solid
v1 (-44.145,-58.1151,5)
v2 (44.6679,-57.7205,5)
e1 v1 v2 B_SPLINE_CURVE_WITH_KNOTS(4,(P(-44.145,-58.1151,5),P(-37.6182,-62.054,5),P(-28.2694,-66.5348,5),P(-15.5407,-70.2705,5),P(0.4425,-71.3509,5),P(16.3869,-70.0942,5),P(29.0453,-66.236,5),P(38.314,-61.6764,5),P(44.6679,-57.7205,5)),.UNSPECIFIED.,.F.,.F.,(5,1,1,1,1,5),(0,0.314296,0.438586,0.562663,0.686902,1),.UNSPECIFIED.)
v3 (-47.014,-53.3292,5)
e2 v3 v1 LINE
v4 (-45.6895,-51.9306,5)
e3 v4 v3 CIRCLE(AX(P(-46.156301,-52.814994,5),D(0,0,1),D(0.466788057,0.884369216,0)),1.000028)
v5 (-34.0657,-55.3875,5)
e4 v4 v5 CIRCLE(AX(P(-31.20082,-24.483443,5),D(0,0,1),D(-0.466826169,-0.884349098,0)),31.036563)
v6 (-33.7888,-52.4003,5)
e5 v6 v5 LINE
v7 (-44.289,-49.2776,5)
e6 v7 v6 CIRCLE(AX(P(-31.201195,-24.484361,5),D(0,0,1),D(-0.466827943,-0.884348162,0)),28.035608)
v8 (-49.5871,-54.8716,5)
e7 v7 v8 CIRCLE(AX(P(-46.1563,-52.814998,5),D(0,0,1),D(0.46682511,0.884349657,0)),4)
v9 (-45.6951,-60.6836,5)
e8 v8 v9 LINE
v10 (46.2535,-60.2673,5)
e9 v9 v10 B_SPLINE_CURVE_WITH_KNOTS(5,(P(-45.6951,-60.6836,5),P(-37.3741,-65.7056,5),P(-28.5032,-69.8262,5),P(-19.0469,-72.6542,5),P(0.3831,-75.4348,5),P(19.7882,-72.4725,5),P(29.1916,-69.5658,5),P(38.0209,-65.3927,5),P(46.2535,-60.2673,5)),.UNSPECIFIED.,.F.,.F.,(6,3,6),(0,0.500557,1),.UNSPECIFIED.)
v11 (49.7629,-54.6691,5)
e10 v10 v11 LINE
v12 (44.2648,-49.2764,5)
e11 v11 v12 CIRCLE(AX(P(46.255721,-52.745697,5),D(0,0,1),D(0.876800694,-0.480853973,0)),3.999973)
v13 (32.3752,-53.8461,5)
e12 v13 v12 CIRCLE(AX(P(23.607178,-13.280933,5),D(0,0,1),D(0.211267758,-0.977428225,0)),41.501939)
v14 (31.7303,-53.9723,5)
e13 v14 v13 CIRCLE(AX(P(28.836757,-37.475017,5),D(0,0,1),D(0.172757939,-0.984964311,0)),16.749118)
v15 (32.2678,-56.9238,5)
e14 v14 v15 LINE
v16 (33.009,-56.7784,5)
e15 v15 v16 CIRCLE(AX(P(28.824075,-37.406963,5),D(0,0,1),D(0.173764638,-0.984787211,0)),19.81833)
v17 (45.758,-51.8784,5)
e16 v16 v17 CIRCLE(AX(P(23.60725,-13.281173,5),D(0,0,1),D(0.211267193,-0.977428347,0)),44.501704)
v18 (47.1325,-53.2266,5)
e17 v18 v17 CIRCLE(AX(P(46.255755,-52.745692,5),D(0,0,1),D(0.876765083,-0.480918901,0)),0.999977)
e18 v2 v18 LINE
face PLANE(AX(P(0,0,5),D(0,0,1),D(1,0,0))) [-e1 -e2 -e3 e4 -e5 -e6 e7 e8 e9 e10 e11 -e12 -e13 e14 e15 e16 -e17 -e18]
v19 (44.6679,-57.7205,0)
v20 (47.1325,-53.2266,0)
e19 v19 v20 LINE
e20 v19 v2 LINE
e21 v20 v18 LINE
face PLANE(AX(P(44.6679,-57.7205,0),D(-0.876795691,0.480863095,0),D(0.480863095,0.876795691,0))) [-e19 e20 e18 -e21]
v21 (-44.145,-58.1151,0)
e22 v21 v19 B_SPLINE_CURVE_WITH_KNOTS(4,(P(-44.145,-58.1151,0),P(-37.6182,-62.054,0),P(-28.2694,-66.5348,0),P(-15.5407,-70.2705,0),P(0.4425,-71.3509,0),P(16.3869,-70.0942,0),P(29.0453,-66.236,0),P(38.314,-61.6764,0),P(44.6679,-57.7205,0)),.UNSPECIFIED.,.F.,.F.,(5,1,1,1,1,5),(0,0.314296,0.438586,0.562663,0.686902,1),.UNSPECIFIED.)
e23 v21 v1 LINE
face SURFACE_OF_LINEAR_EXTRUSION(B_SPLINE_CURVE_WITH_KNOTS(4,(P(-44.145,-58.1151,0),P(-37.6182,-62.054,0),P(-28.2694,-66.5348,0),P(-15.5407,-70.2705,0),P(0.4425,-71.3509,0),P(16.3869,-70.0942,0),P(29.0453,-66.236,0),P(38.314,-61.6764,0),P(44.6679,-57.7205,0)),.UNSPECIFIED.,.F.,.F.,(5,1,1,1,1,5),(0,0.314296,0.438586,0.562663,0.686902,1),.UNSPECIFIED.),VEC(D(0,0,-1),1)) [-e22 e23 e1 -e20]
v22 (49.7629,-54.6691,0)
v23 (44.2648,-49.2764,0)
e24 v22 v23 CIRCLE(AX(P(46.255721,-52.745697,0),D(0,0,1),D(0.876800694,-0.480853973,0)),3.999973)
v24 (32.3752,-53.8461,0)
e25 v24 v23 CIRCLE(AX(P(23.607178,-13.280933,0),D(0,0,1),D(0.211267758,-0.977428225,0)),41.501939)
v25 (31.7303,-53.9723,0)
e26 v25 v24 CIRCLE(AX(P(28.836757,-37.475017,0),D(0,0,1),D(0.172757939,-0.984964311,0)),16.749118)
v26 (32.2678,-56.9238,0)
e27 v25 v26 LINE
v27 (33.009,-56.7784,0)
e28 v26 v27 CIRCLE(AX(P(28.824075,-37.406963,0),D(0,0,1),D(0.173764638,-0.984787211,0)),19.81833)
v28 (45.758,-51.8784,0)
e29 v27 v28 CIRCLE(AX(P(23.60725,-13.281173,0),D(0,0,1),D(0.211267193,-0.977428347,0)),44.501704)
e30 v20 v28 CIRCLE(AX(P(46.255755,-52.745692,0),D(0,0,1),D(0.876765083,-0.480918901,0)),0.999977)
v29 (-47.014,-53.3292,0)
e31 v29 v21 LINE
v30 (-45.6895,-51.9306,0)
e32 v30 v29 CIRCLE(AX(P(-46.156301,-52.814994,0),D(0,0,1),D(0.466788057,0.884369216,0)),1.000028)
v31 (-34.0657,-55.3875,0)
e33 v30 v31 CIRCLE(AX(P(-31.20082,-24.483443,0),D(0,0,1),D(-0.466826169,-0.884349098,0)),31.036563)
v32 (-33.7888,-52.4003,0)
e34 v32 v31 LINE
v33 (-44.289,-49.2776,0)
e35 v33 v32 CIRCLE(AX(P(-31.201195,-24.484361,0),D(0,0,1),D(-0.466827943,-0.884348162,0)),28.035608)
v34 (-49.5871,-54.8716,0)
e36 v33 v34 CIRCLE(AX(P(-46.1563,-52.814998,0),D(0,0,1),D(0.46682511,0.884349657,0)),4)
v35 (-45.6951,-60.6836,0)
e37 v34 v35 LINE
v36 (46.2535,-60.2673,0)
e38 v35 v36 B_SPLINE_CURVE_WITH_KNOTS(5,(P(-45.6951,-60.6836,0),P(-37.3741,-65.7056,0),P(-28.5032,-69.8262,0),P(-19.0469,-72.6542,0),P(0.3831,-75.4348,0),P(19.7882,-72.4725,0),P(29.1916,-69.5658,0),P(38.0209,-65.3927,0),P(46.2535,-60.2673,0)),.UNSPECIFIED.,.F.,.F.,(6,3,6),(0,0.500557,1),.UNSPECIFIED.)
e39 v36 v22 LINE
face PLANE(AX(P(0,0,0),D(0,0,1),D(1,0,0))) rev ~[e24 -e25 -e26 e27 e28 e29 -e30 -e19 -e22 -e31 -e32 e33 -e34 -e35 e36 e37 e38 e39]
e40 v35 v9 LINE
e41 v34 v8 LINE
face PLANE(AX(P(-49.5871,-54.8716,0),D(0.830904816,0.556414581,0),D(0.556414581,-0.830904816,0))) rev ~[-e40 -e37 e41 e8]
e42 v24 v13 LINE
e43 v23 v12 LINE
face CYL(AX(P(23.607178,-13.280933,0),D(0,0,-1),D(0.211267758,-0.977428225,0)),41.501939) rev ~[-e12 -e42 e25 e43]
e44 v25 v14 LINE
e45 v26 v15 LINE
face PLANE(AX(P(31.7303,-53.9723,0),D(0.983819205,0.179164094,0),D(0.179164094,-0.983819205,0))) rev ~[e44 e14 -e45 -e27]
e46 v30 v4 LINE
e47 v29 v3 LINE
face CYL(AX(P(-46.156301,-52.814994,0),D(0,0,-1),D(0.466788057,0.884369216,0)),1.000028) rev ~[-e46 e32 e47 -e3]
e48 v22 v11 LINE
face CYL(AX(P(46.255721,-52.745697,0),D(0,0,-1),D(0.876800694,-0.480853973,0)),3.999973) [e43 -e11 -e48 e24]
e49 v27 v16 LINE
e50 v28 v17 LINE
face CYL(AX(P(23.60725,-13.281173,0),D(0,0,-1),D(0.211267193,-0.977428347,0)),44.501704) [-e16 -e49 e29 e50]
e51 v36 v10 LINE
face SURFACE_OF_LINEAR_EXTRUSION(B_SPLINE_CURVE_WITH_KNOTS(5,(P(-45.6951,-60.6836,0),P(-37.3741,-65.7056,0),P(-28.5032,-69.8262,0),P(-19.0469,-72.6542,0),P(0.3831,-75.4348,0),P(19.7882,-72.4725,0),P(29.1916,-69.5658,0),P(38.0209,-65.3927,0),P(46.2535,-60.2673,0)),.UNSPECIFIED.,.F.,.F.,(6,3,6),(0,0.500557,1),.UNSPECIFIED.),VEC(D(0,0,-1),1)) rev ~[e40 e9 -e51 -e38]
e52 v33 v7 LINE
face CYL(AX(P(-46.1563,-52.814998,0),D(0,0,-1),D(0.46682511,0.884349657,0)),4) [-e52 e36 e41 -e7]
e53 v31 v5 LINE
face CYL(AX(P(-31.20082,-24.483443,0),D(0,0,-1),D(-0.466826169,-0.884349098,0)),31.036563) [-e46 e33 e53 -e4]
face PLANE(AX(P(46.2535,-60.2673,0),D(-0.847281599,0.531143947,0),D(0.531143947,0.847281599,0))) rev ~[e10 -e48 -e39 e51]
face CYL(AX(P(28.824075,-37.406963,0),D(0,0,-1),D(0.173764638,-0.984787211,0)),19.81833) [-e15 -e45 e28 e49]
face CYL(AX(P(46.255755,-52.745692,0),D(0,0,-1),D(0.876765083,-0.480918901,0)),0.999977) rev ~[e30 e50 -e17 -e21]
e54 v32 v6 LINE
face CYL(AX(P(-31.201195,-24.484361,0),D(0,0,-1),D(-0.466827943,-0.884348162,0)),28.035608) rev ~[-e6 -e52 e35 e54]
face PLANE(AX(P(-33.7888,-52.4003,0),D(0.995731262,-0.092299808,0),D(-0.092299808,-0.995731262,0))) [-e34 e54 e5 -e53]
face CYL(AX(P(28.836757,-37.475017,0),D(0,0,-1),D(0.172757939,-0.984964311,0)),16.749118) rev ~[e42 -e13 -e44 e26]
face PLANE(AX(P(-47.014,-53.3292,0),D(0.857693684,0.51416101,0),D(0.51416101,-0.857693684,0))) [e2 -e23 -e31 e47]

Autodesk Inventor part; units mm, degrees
ref_plane "YZ Plane" through (0, 0, 0) normal (1, 0, 0) x (0, 1, 0)
ref_plane "XZ Plane" through (0, 0, 0) normal (0, 1, 0) x (-1, 0, 0)
ref_plane "XY Plane" through (0, 0, 0) normal (0, 0, 1) x (1, 0, 0)
sketch "スケッチ1" plane through (0, 0, 0) normal (0, 0, 1) x (1, 0, 0)
  arc A0 (47.1325, -53.2266) -> (45.758, -51.8784) centre (46.2557, -52.7457) ccw
  arc A1 (33.009, -56.7784) -> (45.758, -51.8784) centre (23.6069, -13.28) ccw
  arc A2 (11.1932, -28.6204) -> (33.009, -56.7784) centre (28.8377, -37.4801) ccw
  arc A3 (11.1932, -28.6204) -> (-11.1841, -28.6384) centre (0, -23) ccw
  arc A4 (-22.0046, -54.1258) -> (-11.1841, -28.6384) centre (-27.3796, -36.8033) ccw
  arc A5 (-45.6895, -51.9306) -> (-22.0046, -54.1258) centre (-31.2017, -24.4856) ccw
  arc A6 (-45.6895, -51.9306) -> (-47.014, -53.3291) centre (-46.1563, -52.815) ccw
  line L0 (-47.014, -53.3291) -> (-44.145, -58.1151)
  spline S0 degree 4 poles (-44.145, -58.1151) (-43.8381, -58.3003) (-43.4088, -58.5568) (-42.8575, -58.8816) (-42.1841, -59.2711) (-41.6963, -59.5497) (-41.2094, -59.8243) (-40.7232, -60.0949) (-40.2377, -60.3617) (-39.7528, -60.6247) (-39.2684, -60.8839) (-38.7844, -61.1395) (-38.3007, -61.3914) (-37.8172, -61.6398) (-37.334, -61.8846) (-36.8508, -62.1259) (-36.3678, -62.3637) (-35.8847, -62.5981) (-35.4015, -62.8291) (-34.9183, -63.0567) (-34.4349, -63.281) (-33.9513, -63.502) (-33.4675, -63.7196) (-32.9834, -63.934) (-32.499, -64.1451) (-32.0143, -64.3529) (-31.5292, -64.5576) (-31.0437, -64.7589) (-30.5578, -64.9571) (-30.0715, -65.1521) (-29.5847, -65.3439) (-29.0974, -65.5325) (-28.6097, -65.7179) (-28.1214, -65.9001) (-27.6326, -66.0792) (-27.1433, -66.2551) (-26.6534, -66.4278) (-26.163, -66.5974) (-25.6721, -66.7638) (-25.1806, -66.927) (-24.6885, -67.0871) (-24.1958, -67.244) (-23.7026, -67.3978) (-23.2087, -67.5484) (-22.7144, -67.6958) (-22.2194, -67.8401) (-21.7238, -67.9811) (-21.2277, -68.1191) (-20.7311, -68.2538) (-20.2338, -68.3854) (-19.736, -68.5137) (-19.2377, -68.6389) (-18.7388, -68.7609) (-18.2393, -68.8798) (-17.7394, -68.9954) (-17.2389, -69.1078) (-16.7379, -69.217) (-16.2363, -69.323) (-15.7343, -69.4258) (-15.2318, -69.5254) (-14.7289, -69.6218) (-14.2255, -69.7149) (-13.7216, -69.8049) (-13.2173, -69.8915) (-12.7125, -69.975) (-12.2074, -70.0552) (-11.7018, -70.1322) (-11.1959, -70.2059) (-10.6896, -70.2764) (-10.1829, -70.3436) (-9.6759, -70.4075) (-9.1686, -70.4683) (-8.661, -70.5257) (-8.1531, -70.5799) (-7.6449, -70.6308) (-7.1364, -70.6784) (-6.6277, -70.7228) (-6.1188, -70.7639) (-5.6096, -70.8017) (-5.1003, -70.8362) (-4.5907, -70.8674) (-4.0811, -70.8954) (-3.5712, -70.9201) (-3.0613, -70.9415) (-2.5513, -70.9596) (-2.0411, -70.9744) (-1.5309, -70.9859) (-1.0206, -70.9941) (-0.5103, -70.9991) (0, -71.0007) (0.5103, -70.9991) (1.0206, -70.9941) (1.5309, -70.9859) (2.0411, -70.9744) (2.5512, -70.9596) (3.0613, -70.9415) (3.5712, -70.9201) (4.0811, -70.8954) (4.5907, -70.8674) (5.1002, -70.8362) (5.6096, -70.8017) (6.1187, -70.7639) (6.6276, -70.7228) (7.1363, -70.6784) (7.6447, -70.6308) (8.1529, -70.5799) (8.6608, -70.5257) (9.1683, -70.4683) (9.6756, -70.4076) (10.1825, -70.3436) (10.6891, -70.2764) (11.1953, -70.2059) (11.7011, -70.1322) (12.2065, -70.0553) (12.7115, -69.9751) (13.2161, -69.8917) (13.7202, -69.805) (14.2238, -69.7151) (14.727, -69.622) (15.2297, -69.5257) (15.7318, -69.4261) (16.2335, -69.3234) (16.7346, -69.2175) (17.2352, -69.1083) (17.7352, -68.996) (18.2346, -68.8805) (18.7335, -68.7617) (19.2317, -68.6399) (19.7293, -68.5148) (20.2264, -68.3866) (20.7227, -68.2552) (21.2185, -68.1207) (21.7136, -67.983) (22.208, -67.8421) (22.7018, -67.6981) (23.1948, -67.551) (23.6872, -67.4008) (24.1789, -67.2474) (24.6699, -67.0909) (25.1602, -66.9313) (25.6497, -66.7686) (26.1386, -66.6028) (26.6267, -66.4339) (27.1141, -66.2618) (27.6008, -66.0867) (28.0867, -65.9085) (28.5719, -65.7272) (29.0563, -65.5428) (29.54, -65.3554) (30.023, -65.1648) (30.5052, -64.9712) (30.9867, -64.7745) (31.4674, -64.5748) (31.9475, -64.3719) (32.4267, -64.166) (32.9053, -63.9571) (33.3831, -63.745) (33.8603, -63.5299) (34.3367, -63.3117) (34.8124, -63.0904) (35.2875, -62.8661) (35.7619, -62.6386) (36.2356, -62.4081) (36.7086, -62.1745) (37.181, -61.9378) (37.6528, -61.698) (38.124, -61.455) (38.5946, -61.209) (39.0646, -60.9598) (39.5341, -60.7075) (40.003, -60.452) (40.4714, -60.1934) (40.9394, -59.9316) (41.4069, -59.6666) (41.8739, -59.3984) (42.3406, -59.127) (42.8069, -58.8523) (43.4481, -58.4698) (43.9715, -58.1517) (44.3779, -57.9011) (44.6679, -57.7205) knots 0 0 0 0 0 0.014541 0.020333 0.02611 0.031872 0.03762 0.043355 0.049078 0.054789 0.060489 0.066178 0.071857 0.077527 0.083187 0.088839 0.094483 0.10012 0.105749 0.111371 0.116986 0.122595 0.128199 0.133797 0.139389 0.144976 0.150559 0.156136 0.16171 0.167279 0.172845 0.178407 0.183965 0.18952 0.195072 0.20062 0.206166 0.211709 0.21725 0.222788 0.228323 0.233857 0.239388 0.244918 0.250445 0.255971 0.261495 0.267017 0.272538 0.278057 0.283575 0.289092 0.294608 0.300122 0.305635 0.311147 0.316658 0.322169 0.327678 0.333186 0.338694 0.344201 0.349707 0.355213 0.360718 0.366222 0.371726 0.377229 0.382732 0.388235 0.393737 0.399238 0.404739 0.41024 0.415741 0.421241 0.426741 0.432241 0.43774 0.44324 0.448739 0.454238 0.459737 0.465236 0.470734 0.476233 0.481731 0.48723 0.492728 0.498227 0.503725 0.509224 0.514722 0.520221 0.525719 0.531218 0.536717 0.542216 0.547715 0.553214 0.558714 0.564214 0.569713 0.575214 0.580714 0.586215 0.591716 0.597217 0.602718 0.60822 0.613723 0.619225 0.624728 0.630232 0.635736 0.641241 0.646746 0.652251 0.657758 0.663264 0.668772 0.67428 0.679789 0.685299 0.690809 0.69632 0.701832 0.707345 0.712859 0.718374 0.72389 0.729407 0.734925 0.740444 0.745965 0.751487 0.75701 0.762535 0.768061 0.773588 0.779117 0.784648 0.790181 0.795715 0.801252 0.80679 0.812331 0.817873 0.823418 0.828965 0.834515 0.840067 0.845622 0.85118 0.85674 0.862304 0.867871 0.873441 0.879014 0.884591 0.890172 0.895757 0.901345 0.906938 0.912535 0.918137 0.923743 0.929355 0.934971 0.940593 0.946221 0.951854 0.957493 0.963139 0.968791 0.974449 0.980115 0.985788 1 1 1 1 1
  line L1 (44.6679, -57.7205) -> (47.1325, -53.2266)
  arc A7 (4.5969, -37.0887) -> (23.8174, -61.1986) centre (28.8377, -37.4801) ccw
  spline S1 degree 3 poles (23.923, -63.1268) (24.0467, -63.086) (24.1612, -63.0216) (24.3592, -62.8523) (24.4407, -62.7492) (24.5595, -62.5175) (24.5958, -62.3911) (24.6178, -62.1316) (24.6033, -62.0009) (24.5251, -61.7525) (24.4622, -61.6371) (24.3075, -61.4513) (24.2222, -61.3781) (24.0311, -61.2629) (23.9266, -61.2217) (23.8174, -61.1986) knots 0 0 0 0 0.148947 0.148947 0.297893 0.297893 0.44684 0.44684 0.595787 0.595787 0.744733 0.744733 0.872367 0.872367 1 1 1 1
  spline S2 degree 3 poles (23.923, -63.1268) (23.6264, -63.2244) (21.6991, -63.8462) (18.9298, -64.6237) (14.7719, -65.5721) (11.4157, -66.1631) (7.1944, -66.6887) (3.8013, -66.9375) (-0.4475, -67.0324) (-3.8473, -66.9351) (-8.0854, -66.5978) (-11.4616, -66.156) (-15.6527, -65.3916) (-18.978, -64.6118) (-23.0925, -63.431) (-25.7434, -62.5289) (-27.5645, -61.8359) (-27.7718, -61.756) knots -0.770978 -0.770978 -0.770978 -0.770978 -0.760435 -0.70257 -0.673637 -0.615772 -0.58684 -0.528974 -0.500042 -0.442177 -0.413244 -0.355379 -0.326446 -0.268581 -0.239649 -0.181783 -0.174342 -0.174342 -0.174342 -0.174342
  spline S3 degree 3 poles (-27.5161, -59.8282) (-27.6456, -59.8417) (-27.7712, -59.8804) (-28.0006, -60.0037) (-28.1022, -60.0872) (-28.2675, -60.2884) (-28.3298, -60.4042) (-28.4064, -60.6531) (-28.42, -60.7838) (-28.3964, -61.0432) (-28.3594, -61.1693) (-28.2435, -61.3919) (-28.1687, -61.4881) (-27.9885, -61.6491) (-27.8845, -61.7126) (-27.7718, -61.756) knots 0 0 0 0 0.145866 0.145866 0.291731 0.291731 0.437597 0.437597 0.583462 0.583462 0.729328 0.729328 0.864664 0.864664 1 1 1 1
  arc A8 (-27.5161, -59.8282) -> (-20.671, -58.4236) centre (-31.2017, -24.4856) ccw
  arc A9 (-20.671, -58.4236) -> (-4.7434, -37.0245) centre (-27.3796, -36.8033) ccw
  arc A10 (-3.4858, -36.0681) -> (-4.7434, -37.0245) centre (-3.7435, -37.0343) ccw
  arc A11 (-3.4858, -36.0681) -> (3.3494, -36.1037) centre (0, -23) ccw
  arc A12 (4.5969, -37.0887) -> (3.3494, -36.1037) centre (3.597, -37.0726) ccw
  circle A13 centre (0, -23) radius 8.525
  circle A14 centre (0, 0) radius 1.5
  circle A15 centre (-6.3066, -8.8137) radius 1.5
  line L2 (5.2372, 1.6799) -> (11.9265, -19.1744)
  arc A16 (5.2372, 1.6799) -> (-4.7491, 2.7742) centre (0, 0) ccw
  line L3 (-4.7491, 2.7742) -> (-10.1922, -6.5439)
  arc A17 (-10.1922, -6.5439) -> (-10.7715, -8.253) centre (-6.3066, -8.8137) ccw
  line L4 (-10.7715, -8.253) -> (-12.4274, -21.4394)
  arc A18 (11.9265, -19.1744) -> (-12.4274, -21.4394) centre (0, -23) ccw
  arc A19 (-9.0832, -7.6778) -> (-5.0879, -11.555) centre (-6.3066, -8.8137) ccw
  line L5 (-9.0832, -7.6778) -> (-4.9441, 2.4403)
sketch "スケッチ2" plane through (0, 0, 0) normal (0, 0, 1) x (1, 0, 0)
  spline S0 degree 4 poles (-44.145, -58.1151) (-37.6182, -62.054) (-28.2694, -66.5348) (-15.5407, -70.2705) (0.4425, -71.3509) (16.3869, -70.0942) (29.0453, -66.236) (38.314, -61.6764) (44.6679, -57.7205) knots 0 0 0 0 0 0.314296 0.438586 0.562663 0.686902 1 1 1 1 1
  arc A0 (-45.6895, -51.9306) -> (-47.014, -53.3292) centre (-46.1563, -52.815) ccw
  arc A1 (-45.6895, -51.9306) -> (-34.0657, -55.3875) centre (-31.2017, -24.4856) ccw
  arc A2 (-22.0045, -54.1258) -> (-11.1841, -28.6384) centre (-27.3796, -36.8033) ccw
  arc A3 (32.2678, -56.9238) -> (33.009, -56.7784) centre (28.8377, -37.4801) ccw
  arc A4 (33.009, -56.7784) -> (45.758, -51.8784) centre (23.6069, -13.28) ccw
  arc A5 (47.1325, -53.2266) -> (45.758, -51.8784) centre (46.2557, -52.7457) ccw
  arc A6 (-22.8936, -51.2605) -> (-13.8629, -29.9889) centre (-27.3796, -36.8033) ccw
  arc A7 (-44.289, -49.2776) -> (-33.7888, -52.4003) centre (-31.2017, -24.4856) ccw
  arc A8 (-44.289, -49.2776) -> (-49.5871, -54.8716) centre (-46.1563, -52.815) ccw
  arc A9 (31.7303, -53.9723) -> (32.3752, -53.8461) centre (28.8377, -37.4801) ccw
  arc A10 (32.3752, -53.8461) -> (44.2648, -49.2764) centre (23.6069, -13.28) ccw
  arc A11 (49.7629, -54.6691) -> (44.2648, -49.2764) centre (46.2557, -52.7457) ccw
  line L0 (-49.5871, -54.8716) -> (-45.6951, -60.6836)
  line L1 (46.2535, -60.2673) -> (49.7629, -54.6691)
  line L2 (-33.7888, -52.4003) -> (-34.0657, -55.3875)
  line L3 (-47.014, -53.3292) -> (-44.145, -58.1151)
  line L4 (44.6679, -57.7205) -> (47.1325, -53.2266)
  line L5 (31.7303, -53.9723) -> (32.2678, -56.9238)
  spline S1 degree 5 poles (-45.6951, -60.6836) (-37.3741, -65.7056) (-28.5032, -69.8262) (-19.0469, -72.6542) (0.3831, -75.4348) (19.7882, -72.4725) (29.1916, -69.5658) (38.0209, -65.3927) (46.2535, -60.2673) knots 0 0 0 0 0 0 0.500557 0.500557 0.500557 1 1 1 1 1 1
  point P0 (0, 0)
  point P1 (11.1932, -28.6204)
  point P2 (-33.3656, -63.7642)
  point P3 (-22.3576, -67.7993)
  point P4 (-11.0481, -70.226)
  point P5 (0.4419, -70.9986)
  point P6 (11.9239, -70.0979)
  point P7 (23.204, -67.5475)
  point P8 (34.1337, -63.4043)
  dimension "d0" = 3
  dimension "d1" = 3
  dimension "d2" = 3
extrude "押し出し1" add sketch "スケッチ2" along normal blind 5
properties part number "脚ゴム" material "ゴム、シリコーン"
